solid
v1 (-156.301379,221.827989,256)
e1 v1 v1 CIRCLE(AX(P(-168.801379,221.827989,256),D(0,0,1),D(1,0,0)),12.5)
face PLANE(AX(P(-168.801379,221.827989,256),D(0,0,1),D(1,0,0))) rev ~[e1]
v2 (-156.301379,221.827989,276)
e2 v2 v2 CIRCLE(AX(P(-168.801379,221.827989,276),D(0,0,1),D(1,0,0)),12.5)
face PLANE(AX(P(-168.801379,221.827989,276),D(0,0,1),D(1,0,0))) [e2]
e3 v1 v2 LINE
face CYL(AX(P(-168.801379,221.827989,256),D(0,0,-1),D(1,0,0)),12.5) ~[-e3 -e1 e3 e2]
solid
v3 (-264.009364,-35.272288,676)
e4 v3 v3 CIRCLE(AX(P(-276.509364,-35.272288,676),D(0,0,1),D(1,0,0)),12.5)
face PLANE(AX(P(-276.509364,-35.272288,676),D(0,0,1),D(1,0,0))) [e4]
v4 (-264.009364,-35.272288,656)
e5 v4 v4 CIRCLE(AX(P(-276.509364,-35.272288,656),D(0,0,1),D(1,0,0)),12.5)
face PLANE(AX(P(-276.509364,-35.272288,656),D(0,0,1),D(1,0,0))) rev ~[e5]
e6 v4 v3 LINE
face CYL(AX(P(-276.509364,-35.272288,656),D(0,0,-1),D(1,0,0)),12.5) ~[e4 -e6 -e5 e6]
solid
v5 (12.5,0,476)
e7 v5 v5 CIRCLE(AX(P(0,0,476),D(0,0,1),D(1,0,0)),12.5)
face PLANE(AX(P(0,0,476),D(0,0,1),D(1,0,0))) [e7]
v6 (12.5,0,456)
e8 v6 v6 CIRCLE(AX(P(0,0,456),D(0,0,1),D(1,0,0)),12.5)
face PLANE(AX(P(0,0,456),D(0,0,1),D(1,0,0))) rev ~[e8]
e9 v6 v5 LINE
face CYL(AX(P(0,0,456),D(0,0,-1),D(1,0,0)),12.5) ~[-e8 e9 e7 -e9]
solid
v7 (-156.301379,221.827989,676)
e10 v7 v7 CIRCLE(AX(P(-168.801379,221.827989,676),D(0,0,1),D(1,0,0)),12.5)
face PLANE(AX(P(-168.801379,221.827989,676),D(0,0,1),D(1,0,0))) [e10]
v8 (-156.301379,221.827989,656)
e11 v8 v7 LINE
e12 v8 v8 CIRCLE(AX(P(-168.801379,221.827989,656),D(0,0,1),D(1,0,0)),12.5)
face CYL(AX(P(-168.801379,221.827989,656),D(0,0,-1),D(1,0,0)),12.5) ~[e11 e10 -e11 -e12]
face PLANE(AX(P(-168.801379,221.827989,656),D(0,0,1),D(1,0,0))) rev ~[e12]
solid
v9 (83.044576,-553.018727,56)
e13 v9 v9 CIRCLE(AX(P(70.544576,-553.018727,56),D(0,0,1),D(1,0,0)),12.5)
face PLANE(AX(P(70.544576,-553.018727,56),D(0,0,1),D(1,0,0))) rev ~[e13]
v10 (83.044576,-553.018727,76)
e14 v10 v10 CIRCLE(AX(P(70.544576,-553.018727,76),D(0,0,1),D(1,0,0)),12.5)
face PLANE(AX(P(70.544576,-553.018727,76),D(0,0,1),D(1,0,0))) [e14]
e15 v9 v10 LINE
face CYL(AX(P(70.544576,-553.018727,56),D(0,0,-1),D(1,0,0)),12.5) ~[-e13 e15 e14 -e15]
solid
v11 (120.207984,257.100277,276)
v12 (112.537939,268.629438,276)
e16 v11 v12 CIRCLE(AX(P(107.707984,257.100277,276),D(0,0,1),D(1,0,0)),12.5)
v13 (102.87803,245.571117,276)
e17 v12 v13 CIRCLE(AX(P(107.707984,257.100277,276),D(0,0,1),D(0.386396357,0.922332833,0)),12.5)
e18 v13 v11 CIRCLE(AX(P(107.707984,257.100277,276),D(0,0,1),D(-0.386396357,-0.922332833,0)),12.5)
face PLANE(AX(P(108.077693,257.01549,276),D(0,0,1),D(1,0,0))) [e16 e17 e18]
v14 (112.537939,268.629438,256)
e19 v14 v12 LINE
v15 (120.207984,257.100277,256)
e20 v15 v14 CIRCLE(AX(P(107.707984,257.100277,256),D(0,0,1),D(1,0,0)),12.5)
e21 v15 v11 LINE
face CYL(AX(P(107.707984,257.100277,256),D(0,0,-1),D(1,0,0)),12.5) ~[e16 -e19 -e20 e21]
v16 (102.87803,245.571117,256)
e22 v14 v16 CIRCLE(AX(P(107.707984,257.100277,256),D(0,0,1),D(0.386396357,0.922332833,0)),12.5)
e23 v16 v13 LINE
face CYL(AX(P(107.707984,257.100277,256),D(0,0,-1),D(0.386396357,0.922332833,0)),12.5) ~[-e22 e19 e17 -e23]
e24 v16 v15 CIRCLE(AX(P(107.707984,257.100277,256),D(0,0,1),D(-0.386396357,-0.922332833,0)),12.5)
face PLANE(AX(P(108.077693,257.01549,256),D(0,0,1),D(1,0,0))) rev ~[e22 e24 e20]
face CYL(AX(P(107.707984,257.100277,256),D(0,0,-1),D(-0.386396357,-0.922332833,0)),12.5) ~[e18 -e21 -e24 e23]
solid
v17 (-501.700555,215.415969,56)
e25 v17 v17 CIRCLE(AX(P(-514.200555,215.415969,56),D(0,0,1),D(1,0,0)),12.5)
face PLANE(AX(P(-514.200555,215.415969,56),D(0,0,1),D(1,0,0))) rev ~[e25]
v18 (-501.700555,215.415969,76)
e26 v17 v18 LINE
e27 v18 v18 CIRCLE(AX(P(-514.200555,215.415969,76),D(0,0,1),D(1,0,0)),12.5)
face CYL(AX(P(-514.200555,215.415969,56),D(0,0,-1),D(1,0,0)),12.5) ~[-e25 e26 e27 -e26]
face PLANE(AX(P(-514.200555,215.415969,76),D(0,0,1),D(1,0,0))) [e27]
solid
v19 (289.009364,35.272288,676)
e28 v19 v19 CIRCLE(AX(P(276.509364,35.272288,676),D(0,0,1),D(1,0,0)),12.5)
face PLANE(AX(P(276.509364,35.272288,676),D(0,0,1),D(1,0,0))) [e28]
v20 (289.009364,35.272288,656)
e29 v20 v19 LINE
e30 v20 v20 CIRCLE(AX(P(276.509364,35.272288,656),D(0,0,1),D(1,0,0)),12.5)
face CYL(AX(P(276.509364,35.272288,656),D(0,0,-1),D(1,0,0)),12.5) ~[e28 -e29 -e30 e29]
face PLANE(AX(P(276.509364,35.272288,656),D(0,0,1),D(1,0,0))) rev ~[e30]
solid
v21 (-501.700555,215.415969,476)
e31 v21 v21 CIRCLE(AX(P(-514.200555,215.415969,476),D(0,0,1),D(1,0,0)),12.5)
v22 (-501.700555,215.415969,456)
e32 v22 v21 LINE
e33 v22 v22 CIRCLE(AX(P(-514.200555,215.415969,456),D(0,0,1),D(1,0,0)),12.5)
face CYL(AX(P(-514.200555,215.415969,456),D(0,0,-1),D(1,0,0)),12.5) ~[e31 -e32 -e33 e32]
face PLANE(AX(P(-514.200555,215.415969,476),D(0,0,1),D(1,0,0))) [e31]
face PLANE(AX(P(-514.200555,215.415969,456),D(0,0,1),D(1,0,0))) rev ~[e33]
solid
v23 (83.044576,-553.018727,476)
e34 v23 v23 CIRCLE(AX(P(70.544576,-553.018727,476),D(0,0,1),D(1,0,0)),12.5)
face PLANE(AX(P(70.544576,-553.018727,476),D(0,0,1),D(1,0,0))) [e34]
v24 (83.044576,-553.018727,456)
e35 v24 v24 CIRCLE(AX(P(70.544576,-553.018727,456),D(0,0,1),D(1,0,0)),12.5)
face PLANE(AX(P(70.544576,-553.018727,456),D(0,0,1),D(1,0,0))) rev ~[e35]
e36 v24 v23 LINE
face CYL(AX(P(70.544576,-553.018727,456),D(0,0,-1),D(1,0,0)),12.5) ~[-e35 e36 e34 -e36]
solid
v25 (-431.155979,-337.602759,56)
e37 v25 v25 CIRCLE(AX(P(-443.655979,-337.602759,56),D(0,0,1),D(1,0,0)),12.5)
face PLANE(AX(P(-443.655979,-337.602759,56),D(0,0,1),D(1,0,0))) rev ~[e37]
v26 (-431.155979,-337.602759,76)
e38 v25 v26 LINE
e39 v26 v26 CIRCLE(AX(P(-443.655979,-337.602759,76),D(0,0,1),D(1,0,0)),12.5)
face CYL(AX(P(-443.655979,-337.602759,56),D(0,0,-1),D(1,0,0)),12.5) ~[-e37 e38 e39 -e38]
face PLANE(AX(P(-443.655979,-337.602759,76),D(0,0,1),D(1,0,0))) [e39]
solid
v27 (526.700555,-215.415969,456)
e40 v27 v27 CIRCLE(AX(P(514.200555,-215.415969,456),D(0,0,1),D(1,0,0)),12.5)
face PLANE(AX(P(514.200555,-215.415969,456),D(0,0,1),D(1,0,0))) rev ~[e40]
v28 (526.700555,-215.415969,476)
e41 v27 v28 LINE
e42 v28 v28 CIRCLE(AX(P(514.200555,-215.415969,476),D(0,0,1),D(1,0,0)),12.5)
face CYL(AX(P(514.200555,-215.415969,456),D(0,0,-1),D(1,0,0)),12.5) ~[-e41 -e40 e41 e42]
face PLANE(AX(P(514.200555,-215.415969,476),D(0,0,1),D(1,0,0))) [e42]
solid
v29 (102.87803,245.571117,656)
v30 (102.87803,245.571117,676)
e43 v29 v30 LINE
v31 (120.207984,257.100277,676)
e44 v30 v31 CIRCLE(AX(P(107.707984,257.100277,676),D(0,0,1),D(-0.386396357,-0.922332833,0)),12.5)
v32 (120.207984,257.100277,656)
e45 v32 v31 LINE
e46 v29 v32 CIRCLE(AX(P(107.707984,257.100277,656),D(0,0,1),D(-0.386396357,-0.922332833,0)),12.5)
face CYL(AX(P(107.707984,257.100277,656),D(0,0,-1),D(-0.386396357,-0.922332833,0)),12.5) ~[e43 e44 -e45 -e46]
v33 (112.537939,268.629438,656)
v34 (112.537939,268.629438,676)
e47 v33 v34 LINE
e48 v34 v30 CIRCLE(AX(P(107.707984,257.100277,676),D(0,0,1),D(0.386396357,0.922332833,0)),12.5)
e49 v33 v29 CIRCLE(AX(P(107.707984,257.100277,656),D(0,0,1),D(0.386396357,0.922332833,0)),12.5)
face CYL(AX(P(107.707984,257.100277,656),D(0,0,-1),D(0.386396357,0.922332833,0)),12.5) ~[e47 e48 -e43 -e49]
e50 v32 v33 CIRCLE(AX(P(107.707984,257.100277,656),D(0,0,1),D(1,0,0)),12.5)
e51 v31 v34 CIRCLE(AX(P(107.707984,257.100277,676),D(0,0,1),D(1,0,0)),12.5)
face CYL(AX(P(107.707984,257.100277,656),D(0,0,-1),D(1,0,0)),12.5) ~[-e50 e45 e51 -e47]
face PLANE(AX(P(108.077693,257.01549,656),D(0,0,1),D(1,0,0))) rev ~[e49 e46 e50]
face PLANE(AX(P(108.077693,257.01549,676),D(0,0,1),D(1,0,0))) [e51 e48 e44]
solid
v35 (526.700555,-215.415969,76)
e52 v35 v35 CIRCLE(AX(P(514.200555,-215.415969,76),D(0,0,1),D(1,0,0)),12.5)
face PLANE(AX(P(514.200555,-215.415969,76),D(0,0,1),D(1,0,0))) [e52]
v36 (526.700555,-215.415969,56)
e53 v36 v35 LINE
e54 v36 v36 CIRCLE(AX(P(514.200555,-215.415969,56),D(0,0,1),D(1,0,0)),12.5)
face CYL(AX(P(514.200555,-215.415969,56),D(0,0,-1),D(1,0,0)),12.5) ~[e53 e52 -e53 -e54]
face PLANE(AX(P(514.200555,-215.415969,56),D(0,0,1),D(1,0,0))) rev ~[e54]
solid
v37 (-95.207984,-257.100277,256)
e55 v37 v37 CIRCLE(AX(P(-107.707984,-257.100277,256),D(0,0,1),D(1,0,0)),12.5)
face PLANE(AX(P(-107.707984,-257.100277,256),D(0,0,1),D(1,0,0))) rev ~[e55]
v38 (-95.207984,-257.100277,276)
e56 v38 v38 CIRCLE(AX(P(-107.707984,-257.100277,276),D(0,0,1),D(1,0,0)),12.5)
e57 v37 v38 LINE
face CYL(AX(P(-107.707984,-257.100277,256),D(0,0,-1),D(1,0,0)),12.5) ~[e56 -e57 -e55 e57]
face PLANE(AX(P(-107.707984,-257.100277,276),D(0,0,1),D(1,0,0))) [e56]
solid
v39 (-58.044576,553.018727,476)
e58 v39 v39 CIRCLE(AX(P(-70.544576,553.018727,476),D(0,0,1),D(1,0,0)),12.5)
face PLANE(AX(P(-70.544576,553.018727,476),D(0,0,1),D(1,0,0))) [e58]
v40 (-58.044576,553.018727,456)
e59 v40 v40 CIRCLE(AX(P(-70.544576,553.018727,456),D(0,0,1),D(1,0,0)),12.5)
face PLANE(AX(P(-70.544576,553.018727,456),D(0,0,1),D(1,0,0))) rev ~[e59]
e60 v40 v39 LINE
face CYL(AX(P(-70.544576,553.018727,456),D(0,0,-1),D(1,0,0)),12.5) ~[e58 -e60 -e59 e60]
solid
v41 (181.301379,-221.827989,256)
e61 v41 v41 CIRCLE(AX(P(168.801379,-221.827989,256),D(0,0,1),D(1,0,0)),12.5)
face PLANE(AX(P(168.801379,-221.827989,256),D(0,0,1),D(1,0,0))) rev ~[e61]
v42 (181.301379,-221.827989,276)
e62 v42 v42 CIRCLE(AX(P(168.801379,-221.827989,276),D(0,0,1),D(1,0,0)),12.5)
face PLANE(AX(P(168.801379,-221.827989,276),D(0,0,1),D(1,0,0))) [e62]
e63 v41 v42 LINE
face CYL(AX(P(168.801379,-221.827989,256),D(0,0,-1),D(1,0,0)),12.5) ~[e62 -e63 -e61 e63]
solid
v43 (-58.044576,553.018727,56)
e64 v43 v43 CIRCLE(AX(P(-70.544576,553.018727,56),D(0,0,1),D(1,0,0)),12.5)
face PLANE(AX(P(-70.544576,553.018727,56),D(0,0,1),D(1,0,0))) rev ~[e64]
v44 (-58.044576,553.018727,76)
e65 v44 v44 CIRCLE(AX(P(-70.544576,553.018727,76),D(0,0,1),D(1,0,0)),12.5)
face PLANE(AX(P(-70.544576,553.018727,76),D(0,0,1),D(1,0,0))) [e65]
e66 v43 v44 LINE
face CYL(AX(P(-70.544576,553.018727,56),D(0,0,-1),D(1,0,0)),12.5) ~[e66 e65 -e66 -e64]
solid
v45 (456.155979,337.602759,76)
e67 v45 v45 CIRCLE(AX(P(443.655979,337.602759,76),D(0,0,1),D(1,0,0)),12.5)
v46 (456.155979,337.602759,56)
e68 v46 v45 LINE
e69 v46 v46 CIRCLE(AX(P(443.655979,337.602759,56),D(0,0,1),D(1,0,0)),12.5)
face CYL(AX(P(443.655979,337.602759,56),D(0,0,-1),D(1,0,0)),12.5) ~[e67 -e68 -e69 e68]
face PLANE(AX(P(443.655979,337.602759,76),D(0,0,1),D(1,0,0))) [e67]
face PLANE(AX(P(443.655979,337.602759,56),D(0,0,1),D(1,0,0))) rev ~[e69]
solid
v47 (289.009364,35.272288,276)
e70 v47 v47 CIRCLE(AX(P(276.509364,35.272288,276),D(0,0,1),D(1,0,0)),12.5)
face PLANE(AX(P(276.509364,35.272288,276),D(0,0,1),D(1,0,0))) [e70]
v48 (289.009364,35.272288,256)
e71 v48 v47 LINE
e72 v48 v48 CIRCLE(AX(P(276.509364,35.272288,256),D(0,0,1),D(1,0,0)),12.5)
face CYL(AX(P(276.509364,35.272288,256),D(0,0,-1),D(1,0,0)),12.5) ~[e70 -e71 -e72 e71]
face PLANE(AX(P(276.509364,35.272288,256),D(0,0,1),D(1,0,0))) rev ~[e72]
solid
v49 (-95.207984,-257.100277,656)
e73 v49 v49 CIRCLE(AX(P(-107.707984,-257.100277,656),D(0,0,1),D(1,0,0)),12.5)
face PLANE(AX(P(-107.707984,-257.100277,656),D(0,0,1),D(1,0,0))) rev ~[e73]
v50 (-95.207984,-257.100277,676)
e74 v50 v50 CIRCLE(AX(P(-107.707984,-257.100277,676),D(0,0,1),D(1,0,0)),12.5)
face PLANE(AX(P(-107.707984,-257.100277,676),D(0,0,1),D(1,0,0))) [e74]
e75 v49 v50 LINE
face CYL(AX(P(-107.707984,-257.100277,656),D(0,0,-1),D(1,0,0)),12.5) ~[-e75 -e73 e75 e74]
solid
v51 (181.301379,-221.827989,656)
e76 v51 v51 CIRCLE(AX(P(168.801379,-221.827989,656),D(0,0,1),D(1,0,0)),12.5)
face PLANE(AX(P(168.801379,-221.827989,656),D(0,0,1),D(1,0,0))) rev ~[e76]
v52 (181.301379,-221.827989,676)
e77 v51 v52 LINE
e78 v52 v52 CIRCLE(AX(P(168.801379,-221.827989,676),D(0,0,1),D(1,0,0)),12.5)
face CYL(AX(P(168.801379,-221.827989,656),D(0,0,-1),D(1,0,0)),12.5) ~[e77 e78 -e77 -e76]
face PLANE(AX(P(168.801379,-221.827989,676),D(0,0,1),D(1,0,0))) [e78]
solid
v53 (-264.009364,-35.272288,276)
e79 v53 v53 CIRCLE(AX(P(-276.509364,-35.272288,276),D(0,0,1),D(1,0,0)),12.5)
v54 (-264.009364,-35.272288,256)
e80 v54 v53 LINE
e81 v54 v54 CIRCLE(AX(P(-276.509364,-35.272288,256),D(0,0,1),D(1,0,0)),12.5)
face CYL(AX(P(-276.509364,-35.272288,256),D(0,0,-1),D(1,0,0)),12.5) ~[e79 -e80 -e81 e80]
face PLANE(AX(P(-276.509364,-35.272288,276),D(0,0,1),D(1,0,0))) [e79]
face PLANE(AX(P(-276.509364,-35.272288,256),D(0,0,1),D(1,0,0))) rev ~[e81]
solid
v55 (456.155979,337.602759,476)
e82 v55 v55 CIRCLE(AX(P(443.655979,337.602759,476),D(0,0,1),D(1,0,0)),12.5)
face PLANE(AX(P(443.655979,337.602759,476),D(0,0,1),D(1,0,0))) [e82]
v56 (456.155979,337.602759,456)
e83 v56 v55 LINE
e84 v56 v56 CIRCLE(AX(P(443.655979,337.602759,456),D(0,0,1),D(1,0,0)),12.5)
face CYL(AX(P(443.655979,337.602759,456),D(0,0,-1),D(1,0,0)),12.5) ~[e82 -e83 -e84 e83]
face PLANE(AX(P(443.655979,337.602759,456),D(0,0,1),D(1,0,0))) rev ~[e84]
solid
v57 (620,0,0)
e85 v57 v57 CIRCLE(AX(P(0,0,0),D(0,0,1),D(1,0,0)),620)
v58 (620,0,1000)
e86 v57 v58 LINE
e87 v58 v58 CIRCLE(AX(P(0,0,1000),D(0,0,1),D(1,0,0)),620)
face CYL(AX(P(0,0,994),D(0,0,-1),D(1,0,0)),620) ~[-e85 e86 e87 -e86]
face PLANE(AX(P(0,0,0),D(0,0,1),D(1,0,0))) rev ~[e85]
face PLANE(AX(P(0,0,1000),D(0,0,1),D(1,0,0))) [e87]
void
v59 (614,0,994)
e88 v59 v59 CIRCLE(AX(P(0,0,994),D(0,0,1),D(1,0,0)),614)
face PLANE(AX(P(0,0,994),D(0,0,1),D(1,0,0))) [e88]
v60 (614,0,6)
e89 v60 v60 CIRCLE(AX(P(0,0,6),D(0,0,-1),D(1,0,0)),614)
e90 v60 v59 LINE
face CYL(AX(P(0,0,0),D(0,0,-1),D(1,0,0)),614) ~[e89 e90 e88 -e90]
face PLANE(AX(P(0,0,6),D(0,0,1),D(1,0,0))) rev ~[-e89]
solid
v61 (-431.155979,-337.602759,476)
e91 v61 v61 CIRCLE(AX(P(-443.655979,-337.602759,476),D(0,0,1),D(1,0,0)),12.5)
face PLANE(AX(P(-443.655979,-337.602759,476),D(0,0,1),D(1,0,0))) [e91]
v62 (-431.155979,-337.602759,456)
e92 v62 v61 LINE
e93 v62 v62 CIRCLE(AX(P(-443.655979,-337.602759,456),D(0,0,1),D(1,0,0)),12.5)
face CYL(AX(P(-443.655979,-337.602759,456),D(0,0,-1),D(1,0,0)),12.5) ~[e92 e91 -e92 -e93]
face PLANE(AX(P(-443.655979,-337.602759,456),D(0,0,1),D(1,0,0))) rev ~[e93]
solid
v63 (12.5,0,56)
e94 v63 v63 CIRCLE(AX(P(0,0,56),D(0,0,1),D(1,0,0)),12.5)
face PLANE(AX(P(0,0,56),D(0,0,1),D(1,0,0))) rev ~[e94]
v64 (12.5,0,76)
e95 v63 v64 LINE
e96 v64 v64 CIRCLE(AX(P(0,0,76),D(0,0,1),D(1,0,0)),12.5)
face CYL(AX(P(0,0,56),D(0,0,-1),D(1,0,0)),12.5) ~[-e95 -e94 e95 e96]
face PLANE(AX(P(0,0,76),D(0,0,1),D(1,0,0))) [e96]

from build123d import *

# Parameters (mm, degrees)
F0_R      = 620
F1_DEPTH  = 994
F2_T      = -6
F3_R      = 620
F4_DEPTH  = 6
F6_R      = 12.5
F7_DEPTH  = 20
F9_R      = 12.5
F10_DEPTH = 20
F12_R     = 12.5
F13_DEPTH = 20
F15_R     = 12.5
F16_DEPTH = 20


with BuildPart() as f1:
    # F0 (on Top) → F1 (new body)
    with BuildSketch(Plane.XY):
        Circle(F0_R)
    extrude(amount=F1_DEPTH)

    # F2
    f2_openings = [f1.faces().sort_by_distance(p)[0] for p in [
        (0, 0, 994),
    ]]
    offset(amount=F2_T, openings=f2_openings)

    # F3 (on face) → F4 (join)
    with BuildSketch(Plane.XY.offset(994)):
        Circle(F3_R)
    extrude(amount=F4_DEPTH)


with BuildPart() as f7:
    # F6 (on offset) → F7 (new body)
    with BuildSketch(Plane.XY.offset(56)):
        with Locations((-443.6559786691, -337.6027585657)):
            Circle(F6_R)
    extrude(amount=F7_DEPTH)


with BuildPart() as f7b:
    # F6 (on offset) → F7, piece 2 (new body)
    with BuildSketch(Plane.XY.offset(56)):
        with Locations((70.5445759711, -553.0187273511)):
            Circle(F6_R)
    extrude(amount=F7_DEPTH)


with BuildPart() as f7c:
    # F6 (on offset) → F7, piece 3 (new body)
    with BuildSketch(Plane.XY.offset(56)):
        with Locations((514.2005546402, -215.4159687854)):
            Circle(F6_R)
    extrude(amount=F7_DEPTH)


with BuildPart() as f7d:
    # F6 (on offset) → F7, piece 4 (new body)
    with BuildSketch(Plane.XY.offset(56)):
        with Locations((443.6559786691, 337.6027585657)):
            Circle(F6_R)
    extrude(amount=F7_DEPTH)


with BuildPart() as f7e:
    # F6 (on offset) → F7, piece 5 (new body)
    with BuildSketch(Plane.XY.offset(56)):
        with Locations((-70.5445759711, 553.0187273511)):
            Circle(F6_R)
    extrude(amount=F7_DEPTH)


with BuildPart() as f7f:
    # F6 (on offset) → F7, piece 6 (new body)
    with BuildSketch(Plane.XY.offset(56)):
        with Locations((-514.2005546402, 215.4159687854)):
            Circle(F6_R)
    extrude(amount=F7_DEPTH)


with BuildPart() as f7g:
    # F6 (on offset) → F7, piece 7 (new body)
    with BuildSketch(Plane.XY.offset(56)):
        Circle(F6_R)
    extrude(amount=F7_DEPTH)


with BuildPart() as f10:
    # F9 (on offset) → F10 (new body)
    with BuildSketch(Plane.XY.offset(256)):
        with Locations((-168.8013792829, 221.8279893345)):
            Circle(F9_R)
    extrude(amount=F10_DEPTH)


with BuildPart() as f10b:
    # F9 (on offset) → F10, piece 2 (new body)
    with BuildSketch(Plane.XY.offset(256)):
        with Locations((-276.5093636756, -35.2722879855)):
            Circle(F9_R)
    extrude(amount=F10_DEPTH)


with BuildPart() as f10c:
    # F9 (on offset) → F10, piece 3 (new body)
    with BuildSketch(Plane.XY.offset(256)):
        with Locations((-107.7079843927, -257.1002773201)):
            Circle(F9_R)
    extrude(amount=F10_DEPTH)


with BuildPart() as f10d:
    # F9 (on offset) → F10, piece 4 (new body)
    with BuildSketch(Plane.XY.offset(256)):
        with Locations((168.8013792829, -221.8279893345)):
            Circle(F9_R)
    extrude(amount=F10_DEPTH)


with BuildPart() as f10e:
    # F9 (on offset) → F10, piece 5 (new body)
    with BuildSketch(Plane.XY.offset(256)):
        with Locations((276.5093636756, 35.2722879855)):
            Circle(F9_R)
    extrude(amount=F10_DEPTH)


with BuildPart() as f10f:
    # F9 (on offset) → F10, piece 6 (new body)
    with BuildSketch(Plane.XY.offset(256)):
        with BuildLine():
            ThreePointArc((120.2079843927, 257.1002773201), (118.1152998658, 264.0239890879), (112.5379388498, 268.629437738))
            ThreePointArc((112.5379388498, 268.629437738), (96.1788239748, 261.9302317772), (102.8780299356, 245.5711169021))
            ThreePointArc((102.8780299356, 245.5711169021), (114.6316961605, 246.692961847), (120.2079843927, 257.1002773201))
        make_face()
    extrude(amount=F10_DEPTH)


with BuildPart() as f13:
    # F12 (on offset) → F13 (new body)
    with BuildSketch(Plane.XY.offset(456)):
        with Locations((-443.6559786691, -337.6027585657)):
            Circle(F12_R)
    extrude(amount=F13_DEPTH)


with BuildPart() as f13b:
    # F12 (on offset) → F13, piece 2 (new body)
    with BuildSketch(Plane.XY.offset(456)):
        with Locations((70.5445759711, -553.0187273511)):
            Circle(F12_R)
    extrude(amount=F13_DEPTH)


with BuildPart() as f13c:
    # F12 (on offset) → F13, piece 3 (new body)
    with BuildSketch(Plane.XY.offset(456)):
        with Locations((514.2005546402, -215.4159687854)):
            Circle(F12_R)
    extrude(amount=F13_DEPTH)


with BuildPart() as f13d:
    # F12 (on offset) → F13, piece 4 (new body)
    with BuildSketch(Plane.XY.offset(456)):
        with Locations((443.6559786691, 337.6027585657)):
            Circle(F12_R)
    extrude(amount=F13_DEPTH)


with BuildPart() as f13e:
    # F12 (on offset) → F13, piece 5 (new body)
    with BuildSketch(Plane.XY.offset(456)):
        with Locations((-70.5445759711, 553.0187273511)):
            Circle(F12_R)
    extrude(amount=F13_DEPTH)


with BuildPart() as f13f:
    # F12 (on offset) → F13, piece 6 (new body)
    with BuildSketch(Plane.XY.offset(456)):
        with Locations((-514.2005546402, 215.4159687854)):
            Circle(F12_R)
    extrude(amount=F13_DEPTH)


with BuildPart() as f13g:
    # F12 (on offset) → F13, piece 7 (new body)
    with BuildSketch(Plane.XY.offset(456)):
        Circle(F12_R)
    extrude(amount=F13_DEPTH)


with BuildPart() as f16:
    # F15 (on offset) → F16 (new body)
    with BuildSketch(Plane.XY.offset(656)):
        with Locations((-168.8013792829, 221.8279893345)):
            Circle(F15_R)
    extrude(amount=F16_DEPTH)


with BuildPart() as f16b:
    # F15 (on offset) → F16, piece 2 (new body)
    with BuildSketch(Plane.XY.offset(656)):
        with BuildLine():
            ThreePointArc((120.2079843927, 257.1002773201), (118.1152998658, 264.0239890879), (112.5379388498, 268.629437738))
            ThreePointArc((112.5379388498, 268.629437738), (96.1788239748, 261.9302317772), (102.8780299356, 245.5711169021))
            ThreePointArc((102.8780299356, 245.5711169021), (114.6316961605, 246.692961847), (120.2079843927, 257.1002773201))
        make_face()
    extrude(amount=F16_DEPTH)


with BuildPart() as f16c:
    # F15 (on offset) → F16, piece 3 (new body)
    with BuildSketch(Plane.XY.offset(656)):
        with Locations((276.5093636756, 35.2722879855)):
            Circle(F15_R)
    extrude(amount=F16_DEPTH)


with BuildPart() as f16d:
    # F15 (on offset) → F16, piece 4 (new body)
    with BuildSketch(Plane.XY.offset(656)):
        with Locations((168.8013792829, -221.8279893345)):
            Circle(F15_R)
    extrude(amount=F16_DEPTH)


with BuildPart() as f16e:
    # F15 (on offset) → F16, piece 5 (new body)
    with BuildSketch(Plane.XY.offset(656)):
        with Locations((-107.7079843927, -257.1002773201)):
            Circle(F15_R)
    extrude(amount=F16_DEPTH)


with BuildPart() as f16f:
    # F15 (on offset) → F16, piece 6 (new body)
    with BuildSketch(Plane.XY.offset(656)):
        with Locations((-276.5093636756, -35.2722879855)):
            Circle(F15_R)
    extrude(amount=F16_DEPTH)


solid = Compound([f1.part, f7.part, f7b.part, f7c.part, f7d.part, f7e.part, f7f.part, f7g.part, f10.part, f10b.part, f10c.part, f10d.part, f10e.part, f10f.part, f13.part, f13b.part, f13c.part, f13d.part, f13e.part, f13f.part, f13g.part, f16.part, f16b.part, f16c.part, f16d.part, f16e.part, f16f.part])
